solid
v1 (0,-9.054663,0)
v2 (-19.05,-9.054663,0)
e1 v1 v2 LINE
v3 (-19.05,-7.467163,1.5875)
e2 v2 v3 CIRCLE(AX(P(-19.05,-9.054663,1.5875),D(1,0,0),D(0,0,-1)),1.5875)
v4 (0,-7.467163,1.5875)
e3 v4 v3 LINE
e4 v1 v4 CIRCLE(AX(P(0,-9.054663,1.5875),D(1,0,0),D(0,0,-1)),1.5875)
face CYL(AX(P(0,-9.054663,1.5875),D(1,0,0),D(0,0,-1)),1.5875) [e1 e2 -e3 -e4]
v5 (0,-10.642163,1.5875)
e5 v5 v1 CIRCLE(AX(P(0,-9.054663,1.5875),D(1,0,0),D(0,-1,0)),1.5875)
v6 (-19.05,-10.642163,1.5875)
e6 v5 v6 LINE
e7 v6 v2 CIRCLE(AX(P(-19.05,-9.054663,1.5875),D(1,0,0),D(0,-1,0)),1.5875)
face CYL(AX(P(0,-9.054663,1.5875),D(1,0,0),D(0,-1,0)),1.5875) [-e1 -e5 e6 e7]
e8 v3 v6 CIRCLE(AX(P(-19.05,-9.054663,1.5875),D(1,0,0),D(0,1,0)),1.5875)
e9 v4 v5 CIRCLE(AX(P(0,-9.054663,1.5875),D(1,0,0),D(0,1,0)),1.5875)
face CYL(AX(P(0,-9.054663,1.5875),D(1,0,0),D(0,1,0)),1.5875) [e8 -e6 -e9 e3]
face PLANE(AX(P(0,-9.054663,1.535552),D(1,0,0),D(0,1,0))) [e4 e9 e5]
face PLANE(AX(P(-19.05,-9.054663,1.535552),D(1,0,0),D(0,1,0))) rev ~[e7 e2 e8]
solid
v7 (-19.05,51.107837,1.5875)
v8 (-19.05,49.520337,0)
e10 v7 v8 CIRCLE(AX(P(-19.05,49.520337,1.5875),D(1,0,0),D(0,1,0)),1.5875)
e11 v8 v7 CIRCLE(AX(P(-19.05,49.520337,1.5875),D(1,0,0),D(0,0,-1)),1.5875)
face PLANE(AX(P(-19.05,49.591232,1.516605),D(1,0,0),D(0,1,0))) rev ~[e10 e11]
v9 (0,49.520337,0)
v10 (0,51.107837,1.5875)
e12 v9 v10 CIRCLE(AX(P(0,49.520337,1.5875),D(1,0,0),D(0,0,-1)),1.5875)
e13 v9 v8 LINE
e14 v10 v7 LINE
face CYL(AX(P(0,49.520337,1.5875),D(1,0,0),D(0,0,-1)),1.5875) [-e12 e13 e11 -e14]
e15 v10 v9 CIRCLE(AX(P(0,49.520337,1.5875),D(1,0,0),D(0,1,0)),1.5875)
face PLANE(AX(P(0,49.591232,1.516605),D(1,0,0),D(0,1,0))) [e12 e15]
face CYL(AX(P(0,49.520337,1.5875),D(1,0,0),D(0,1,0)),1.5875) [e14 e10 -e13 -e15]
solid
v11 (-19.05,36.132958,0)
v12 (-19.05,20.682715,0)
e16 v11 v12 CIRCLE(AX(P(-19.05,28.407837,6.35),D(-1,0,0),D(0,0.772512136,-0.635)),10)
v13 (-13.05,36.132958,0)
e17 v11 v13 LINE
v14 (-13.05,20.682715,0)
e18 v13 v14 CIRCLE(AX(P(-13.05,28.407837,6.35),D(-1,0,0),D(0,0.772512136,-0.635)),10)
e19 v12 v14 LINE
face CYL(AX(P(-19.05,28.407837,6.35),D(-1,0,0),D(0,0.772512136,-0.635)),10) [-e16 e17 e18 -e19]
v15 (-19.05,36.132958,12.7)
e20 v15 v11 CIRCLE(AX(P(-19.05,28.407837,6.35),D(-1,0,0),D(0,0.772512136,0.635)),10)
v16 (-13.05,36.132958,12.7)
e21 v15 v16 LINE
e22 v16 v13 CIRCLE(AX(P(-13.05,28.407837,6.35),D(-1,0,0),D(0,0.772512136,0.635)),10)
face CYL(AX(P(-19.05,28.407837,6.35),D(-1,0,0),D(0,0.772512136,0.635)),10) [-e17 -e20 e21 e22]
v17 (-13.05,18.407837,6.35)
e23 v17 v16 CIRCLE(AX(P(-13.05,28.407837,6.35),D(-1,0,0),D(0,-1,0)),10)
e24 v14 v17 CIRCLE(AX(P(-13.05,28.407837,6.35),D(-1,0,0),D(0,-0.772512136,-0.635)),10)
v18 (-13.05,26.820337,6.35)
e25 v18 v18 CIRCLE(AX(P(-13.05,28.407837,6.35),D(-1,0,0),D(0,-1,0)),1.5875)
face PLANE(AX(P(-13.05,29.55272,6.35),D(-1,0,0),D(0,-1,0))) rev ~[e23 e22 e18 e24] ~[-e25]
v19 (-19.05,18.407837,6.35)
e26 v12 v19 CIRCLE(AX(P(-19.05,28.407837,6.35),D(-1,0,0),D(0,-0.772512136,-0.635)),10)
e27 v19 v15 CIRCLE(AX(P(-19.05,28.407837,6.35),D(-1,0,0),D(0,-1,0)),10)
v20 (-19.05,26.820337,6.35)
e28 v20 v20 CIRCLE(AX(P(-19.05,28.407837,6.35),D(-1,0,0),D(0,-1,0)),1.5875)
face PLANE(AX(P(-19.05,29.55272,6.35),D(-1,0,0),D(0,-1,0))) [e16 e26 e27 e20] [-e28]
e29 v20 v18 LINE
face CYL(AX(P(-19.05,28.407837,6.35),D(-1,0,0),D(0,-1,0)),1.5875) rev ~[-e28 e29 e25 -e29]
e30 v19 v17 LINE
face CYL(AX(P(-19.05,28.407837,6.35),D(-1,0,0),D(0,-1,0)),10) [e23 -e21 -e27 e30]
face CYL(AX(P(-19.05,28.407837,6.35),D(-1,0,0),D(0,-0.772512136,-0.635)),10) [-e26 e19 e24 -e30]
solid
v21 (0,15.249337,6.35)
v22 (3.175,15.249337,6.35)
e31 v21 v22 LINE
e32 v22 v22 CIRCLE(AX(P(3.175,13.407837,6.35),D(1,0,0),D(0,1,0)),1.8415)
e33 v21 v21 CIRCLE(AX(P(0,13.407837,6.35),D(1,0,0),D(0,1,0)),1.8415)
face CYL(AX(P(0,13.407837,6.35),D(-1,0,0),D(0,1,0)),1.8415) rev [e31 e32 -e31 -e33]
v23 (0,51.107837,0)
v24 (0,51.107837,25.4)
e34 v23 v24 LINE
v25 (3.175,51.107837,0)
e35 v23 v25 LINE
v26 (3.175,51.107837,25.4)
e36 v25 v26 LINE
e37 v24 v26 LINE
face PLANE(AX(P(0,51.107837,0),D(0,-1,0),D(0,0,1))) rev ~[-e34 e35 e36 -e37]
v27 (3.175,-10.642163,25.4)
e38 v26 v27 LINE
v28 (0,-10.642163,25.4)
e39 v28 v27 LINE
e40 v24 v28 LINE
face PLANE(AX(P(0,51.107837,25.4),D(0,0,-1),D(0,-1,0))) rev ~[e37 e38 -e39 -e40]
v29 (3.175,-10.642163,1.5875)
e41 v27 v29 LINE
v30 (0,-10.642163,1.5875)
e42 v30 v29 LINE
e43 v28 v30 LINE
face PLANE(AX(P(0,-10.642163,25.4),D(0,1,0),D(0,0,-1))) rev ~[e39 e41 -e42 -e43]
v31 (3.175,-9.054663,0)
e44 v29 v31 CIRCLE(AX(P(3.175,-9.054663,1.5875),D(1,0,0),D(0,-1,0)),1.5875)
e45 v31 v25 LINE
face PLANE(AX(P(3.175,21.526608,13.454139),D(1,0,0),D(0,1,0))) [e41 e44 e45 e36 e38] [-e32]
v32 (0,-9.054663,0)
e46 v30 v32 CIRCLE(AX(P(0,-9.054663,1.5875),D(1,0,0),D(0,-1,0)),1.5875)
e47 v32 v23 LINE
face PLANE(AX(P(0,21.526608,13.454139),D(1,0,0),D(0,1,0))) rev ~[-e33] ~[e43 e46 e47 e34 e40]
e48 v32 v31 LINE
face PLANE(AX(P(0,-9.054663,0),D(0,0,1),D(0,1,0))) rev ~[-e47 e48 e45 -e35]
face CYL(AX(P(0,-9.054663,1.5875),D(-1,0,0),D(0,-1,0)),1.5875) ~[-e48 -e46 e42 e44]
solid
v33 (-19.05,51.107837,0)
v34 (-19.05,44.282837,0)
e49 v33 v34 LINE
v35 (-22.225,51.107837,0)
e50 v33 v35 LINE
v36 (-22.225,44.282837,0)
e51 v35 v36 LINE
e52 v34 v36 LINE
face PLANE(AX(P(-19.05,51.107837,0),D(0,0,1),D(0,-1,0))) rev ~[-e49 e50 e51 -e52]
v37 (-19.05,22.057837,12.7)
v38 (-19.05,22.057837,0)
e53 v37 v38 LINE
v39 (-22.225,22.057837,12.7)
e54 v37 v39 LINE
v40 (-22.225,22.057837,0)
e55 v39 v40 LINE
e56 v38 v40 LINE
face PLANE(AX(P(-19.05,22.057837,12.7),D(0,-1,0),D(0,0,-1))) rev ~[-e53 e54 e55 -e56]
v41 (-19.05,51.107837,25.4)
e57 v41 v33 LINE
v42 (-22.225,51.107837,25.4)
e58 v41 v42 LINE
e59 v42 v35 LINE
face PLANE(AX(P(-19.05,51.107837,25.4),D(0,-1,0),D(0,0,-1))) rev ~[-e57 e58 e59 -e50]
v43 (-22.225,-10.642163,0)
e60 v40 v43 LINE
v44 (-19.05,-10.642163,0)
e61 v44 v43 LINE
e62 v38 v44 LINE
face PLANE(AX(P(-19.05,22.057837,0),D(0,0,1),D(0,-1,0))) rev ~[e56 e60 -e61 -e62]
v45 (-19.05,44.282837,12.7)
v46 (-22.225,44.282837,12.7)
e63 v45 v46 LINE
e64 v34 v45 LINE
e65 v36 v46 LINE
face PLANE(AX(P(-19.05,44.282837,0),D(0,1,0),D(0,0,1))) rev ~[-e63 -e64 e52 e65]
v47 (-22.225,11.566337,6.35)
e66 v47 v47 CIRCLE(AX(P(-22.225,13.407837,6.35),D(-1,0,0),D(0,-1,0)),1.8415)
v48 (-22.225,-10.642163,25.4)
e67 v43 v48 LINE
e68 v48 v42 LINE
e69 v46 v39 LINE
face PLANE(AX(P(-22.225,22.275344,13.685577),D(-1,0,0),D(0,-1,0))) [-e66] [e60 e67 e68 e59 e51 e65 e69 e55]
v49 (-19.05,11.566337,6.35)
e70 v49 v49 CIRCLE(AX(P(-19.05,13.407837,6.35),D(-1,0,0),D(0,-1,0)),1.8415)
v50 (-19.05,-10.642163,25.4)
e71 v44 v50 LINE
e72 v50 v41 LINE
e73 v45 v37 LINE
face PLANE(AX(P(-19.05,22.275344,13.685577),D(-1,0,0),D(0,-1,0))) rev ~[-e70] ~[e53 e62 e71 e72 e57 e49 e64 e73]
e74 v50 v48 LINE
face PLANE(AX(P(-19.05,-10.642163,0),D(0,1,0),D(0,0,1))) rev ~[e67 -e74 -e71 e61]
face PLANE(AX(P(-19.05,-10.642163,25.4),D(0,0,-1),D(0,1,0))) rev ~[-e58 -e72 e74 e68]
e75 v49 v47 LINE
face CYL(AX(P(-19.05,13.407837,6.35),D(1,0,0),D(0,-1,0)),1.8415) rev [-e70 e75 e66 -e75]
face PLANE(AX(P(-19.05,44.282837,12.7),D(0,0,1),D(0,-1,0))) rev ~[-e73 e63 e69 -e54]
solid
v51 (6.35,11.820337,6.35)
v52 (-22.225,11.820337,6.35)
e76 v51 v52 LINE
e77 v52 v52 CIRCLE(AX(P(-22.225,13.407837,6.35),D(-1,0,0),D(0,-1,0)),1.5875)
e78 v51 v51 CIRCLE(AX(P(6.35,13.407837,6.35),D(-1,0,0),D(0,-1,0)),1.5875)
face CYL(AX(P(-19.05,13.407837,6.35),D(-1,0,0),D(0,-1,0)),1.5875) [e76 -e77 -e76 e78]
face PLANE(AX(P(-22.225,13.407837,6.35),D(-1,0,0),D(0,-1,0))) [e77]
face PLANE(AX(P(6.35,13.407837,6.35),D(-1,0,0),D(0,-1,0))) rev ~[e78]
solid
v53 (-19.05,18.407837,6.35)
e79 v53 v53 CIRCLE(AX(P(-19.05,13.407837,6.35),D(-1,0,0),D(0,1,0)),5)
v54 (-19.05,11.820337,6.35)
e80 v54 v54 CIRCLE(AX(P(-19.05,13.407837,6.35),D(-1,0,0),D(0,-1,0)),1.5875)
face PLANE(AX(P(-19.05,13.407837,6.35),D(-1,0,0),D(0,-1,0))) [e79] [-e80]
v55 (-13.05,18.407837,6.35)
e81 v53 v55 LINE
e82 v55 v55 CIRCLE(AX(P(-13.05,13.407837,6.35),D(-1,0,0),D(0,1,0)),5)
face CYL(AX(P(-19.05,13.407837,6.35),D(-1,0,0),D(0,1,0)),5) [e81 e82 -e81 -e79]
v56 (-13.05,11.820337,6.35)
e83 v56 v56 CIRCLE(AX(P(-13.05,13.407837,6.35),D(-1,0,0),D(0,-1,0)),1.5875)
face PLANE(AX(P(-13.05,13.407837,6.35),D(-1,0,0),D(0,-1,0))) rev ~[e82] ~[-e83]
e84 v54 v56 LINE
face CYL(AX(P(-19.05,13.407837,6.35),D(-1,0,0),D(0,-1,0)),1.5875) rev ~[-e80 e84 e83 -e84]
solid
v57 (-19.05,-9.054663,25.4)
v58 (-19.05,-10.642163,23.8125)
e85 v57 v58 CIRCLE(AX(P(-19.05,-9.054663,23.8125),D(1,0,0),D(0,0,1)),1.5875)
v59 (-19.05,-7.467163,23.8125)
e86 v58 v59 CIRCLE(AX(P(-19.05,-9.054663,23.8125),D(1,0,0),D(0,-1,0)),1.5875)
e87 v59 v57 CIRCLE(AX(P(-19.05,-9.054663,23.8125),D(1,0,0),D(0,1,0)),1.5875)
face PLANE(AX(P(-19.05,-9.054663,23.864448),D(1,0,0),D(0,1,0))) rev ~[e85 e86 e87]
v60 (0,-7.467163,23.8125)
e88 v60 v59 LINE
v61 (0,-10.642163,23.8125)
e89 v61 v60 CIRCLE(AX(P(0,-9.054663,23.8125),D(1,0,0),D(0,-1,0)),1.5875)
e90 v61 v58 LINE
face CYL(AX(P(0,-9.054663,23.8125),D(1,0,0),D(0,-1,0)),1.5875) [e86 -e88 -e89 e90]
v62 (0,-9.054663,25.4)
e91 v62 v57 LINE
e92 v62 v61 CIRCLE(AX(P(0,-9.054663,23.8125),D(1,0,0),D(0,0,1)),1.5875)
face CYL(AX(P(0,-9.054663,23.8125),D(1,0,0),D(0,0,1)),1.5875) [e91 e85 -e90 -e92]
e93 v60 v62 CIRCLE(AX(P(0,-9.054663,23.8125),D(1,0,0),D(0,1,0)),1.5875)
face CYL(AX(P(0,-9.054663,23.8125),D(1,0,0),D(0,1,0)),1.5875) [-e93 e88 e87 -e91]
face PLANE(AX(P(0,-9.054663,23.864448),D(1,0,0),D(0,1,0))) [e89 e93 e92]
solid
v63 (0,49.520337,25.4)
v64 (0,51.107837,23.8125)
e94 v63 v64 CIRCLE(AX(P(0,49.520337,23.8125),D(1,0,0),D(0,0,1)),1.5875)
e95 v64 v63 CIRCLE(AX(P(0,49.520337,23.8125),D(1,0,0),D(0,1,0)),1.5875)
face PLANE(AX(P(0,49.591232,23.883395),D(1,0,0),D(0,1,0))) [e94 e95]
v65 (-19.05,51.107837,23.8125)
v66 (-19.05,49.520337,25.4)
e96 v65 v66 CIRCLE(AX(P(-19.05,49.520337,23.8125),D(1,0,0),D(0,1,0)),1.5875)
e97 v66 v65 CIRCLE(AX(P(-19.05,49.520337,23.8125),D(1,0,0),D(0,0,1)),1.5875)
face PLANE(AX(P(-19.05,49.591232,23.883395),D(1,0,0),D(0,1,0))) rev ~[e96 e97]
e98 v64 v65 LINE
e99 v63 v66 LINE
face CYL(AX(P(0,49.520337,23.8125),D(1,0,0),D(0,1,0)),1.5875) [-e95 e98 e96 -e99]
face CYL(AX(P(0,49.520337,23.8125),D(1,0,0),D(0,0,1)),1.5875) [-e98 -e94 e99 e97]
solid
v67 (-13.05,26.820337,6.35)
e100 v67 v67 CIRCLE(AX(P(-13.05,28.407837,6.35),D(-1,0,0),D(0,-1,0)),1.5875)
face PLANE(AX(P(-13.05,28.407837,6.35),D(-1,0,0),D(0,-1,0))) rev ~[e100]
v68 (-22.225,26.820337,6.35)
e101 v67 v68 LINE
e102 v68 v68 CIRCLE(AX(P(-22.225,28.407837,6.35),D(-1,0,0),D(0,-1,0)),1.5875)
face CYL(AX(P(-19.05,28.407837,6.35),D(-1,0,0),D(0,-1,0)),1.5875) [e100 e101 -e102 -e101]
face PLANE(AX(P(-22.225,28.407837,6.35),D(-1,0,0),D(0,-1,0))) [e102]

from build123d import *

# Parameters (mm, degrees)
F0_R      = 5
F0_R_2    = 1.8415
F0_R_3    = 1.5875
F1_DEPTH  = 3.175
F2_DEPTH  = 19.05
F3_R      = 1.8415
F4_DEPTH  = 3.175
F3_R_2    = 1.5875
F5_DEPTH  = 3.175
F6_DEPTH  = 6
F7_DEPTH  = 6
F8_DEPTH  = 3.175
F9_DEPTH  = 25.4
F10_DEPTH = 6


# Not quite as in the source:
# - a feature names something its author has since deleted; it is built from what else it names


with BuildPart() as f1:
    # F0 (on Right) → F1 (new body)
    with BuildSketch(Plane.YZ):
        with BuildLine():
            ThreePointArc((18.4078367749, 6.35), (25.0352423421, 15.7641174197), (36.1329581332, 12.7))
            Line((36.1329581332, 12.7), (44.2828367749, 12.7))
            Line((44.2828367749, 12.7), (44.2828367749, 0))
            Line((44.2828367749, 0), (49.5203367749, 0))
            ThreePointArc((49.5203367749, 0), (48.3978047598, 2.7100320151), (51.1078367749, 1.5875))
            Line((51.1078367749, 1.5875), (51.1078367749, 23.8125))
            ThreePointArc((51.1078367749, 23.8125), (48.3978047598, 22.6899679849), (49.5203367749, 25.4))
            Line((49.5203367749, 25.4), (41.8216693056, 25.4))
            Line((41.8216693056, 25.4), (35.8211970083, 25.4))
            Line((35.8211970083, 25.4), (-9.0546632251, 25.4))
            ThreePointArc((-9.0546632251, 25.4), (-7.9321312099, 24.9350320151), (-7.4671632251, 23.8125))
            ThreePointArc((-7.4671632251, 23.8125), (-9.0546632251, 22.225), (-10.6421632251, 23.8125))
            Line((-10.6421632251, 23.8125), (-10.6421632251, 1.5875))
            ThreePointArc((-10.6421632251, 1.5875), (-9.0546632251, 3.175), (-7.4671632251, 1.5875))
            ThreePointArc((-7.4671632251, 1.5875), (-7.9321312099, 0.4649679849), (-9.0546632251, 0))
            Line((-9.0546632251, 0), (20.6827154167, 0))
            ThreePointArc((20.6827154167, 0), (18.9937193553, 2.9774055671), (18.4078367749, 6.35))
        make_face()
        with Locations((13.4078367749, 6.35)):
            Circle(F0_R, mode=Mode.SUBTRACT)
        with BuildLine():
            ThreePointArc((36.1329581332, 0), (37.8219541946, 2.9774055671), (38.4078367749, 6.35))
            ThreePointArc((38.4078367749, 6.35), (37.8219541946, 9.7225944329), (36.1329581332, 12.7))
            Line((36.1329581332, 12.7), (22.0578367749, 12.7))
            Line((22.0578367749, 12.7), (22.0578367749, 0))
            Line((22.0578367749, 0), (36.1329581332, 0))
        make_face()
        with Locations((28.4078367749, 6.35)):
            Circle(F0_R_2, mode=Mode.SUBTRACT)
        with BuildLine():
            ThreePointArc((36.1329581332, 12.7), (37.8219541946, 9.7225944329), (38.4078367749, 6.35))
            ThreePointArc((38.4078367749, 6.35), (37.8219541946, 2.9774055671), (36.1329581332, 0))
            Line((36.1329581332, 0), (43.4878367749, 0))
            Line((43.4878367749, 0), (44.2828367749, 0))
            Line((44.2828367749, 0), (44.2828367749, 12.7))
            Line((44.2828367749, 12.7), (36.1329581332, 12.7))
        make_face()
        with Locations((13.4078367749, 6.35)):
            Circle(F0_R)
        with Locations((13.4078367749, 6.35)):
            Circle(F0_R_2, mode=Mode.SUBTRACT)
        with BuildLine():
            Line((22.0578367749, 12.7), (36.1329581332, 12.7))
            ThreePointArc((36.1329581332, 12.7), (25.0352423421, 15.7641174197), (18.4078367749, 6.35))
            ThreePointArc((18.4078367749, 6.35), (18.9937193553, 2.9774055671), (20.6827154167, 0))
            Line((20.6827154167, 0), (22.0578367749, 0))
            Line((22.0578367749, 0), (22.0578367749, 12.7))
        make_face()
        with Locations((28.4078367749, 6.35)):
            Circle(F0_R_2)
        with Locations((28.4078367749, 6.35)):
            Circle(F0_R_3, mode=Mode.SUBTRACT)
        with BuildLine():
            ThreePointArc((-10.6421632251, 1.5875), (-10.1771952402, 0.4649679849), (-9.0546632251, 0))
            ThreePointArc((-9.0546632251, 0), (-7.9321312099, 0.4649679849), (-7.4671632251, 1.5875))
            ThreePointArc((-7.4671632251, 1.5875), (-9.0546632251, 3.175), (-10.6421632251, 1.5875))
        make_face()
        with BuildLine():
            ThreePointArc((51.1078367749, 1.5875), (48.3978047598, 2.7100320151), (49.5203367749, 0))
            ThreePointArc((49.5203367749, 0), (50.6428687901, 0.4649679849), (51.1078367749, 1.5875))
        make_face()
        with BuildLine():
            ThreePointArc((-9.0546632251, 25.4), (-10.1771952402, 24.9350320151), (-10.6421632251, 23.8125))
            ThreePointArc((-10.6421632251, 23.8125), (-9.0546632251, 22.225), (-7.4671632251, 23.8125))
            ThreePointArc((-7.4671632251, 23.8125), (-7.9321312099, 24.9350320151), (-9.0546632251, 25.4))
        make_face()
        with BuildLine():
            ThreePointArc((49.5203367749, 25.4), (48.3978047598, 22.6899679849), (51.1078367749, 23.8125))
            ThreePointArc((51.1078367749, 23.8125), (50.6428687901, 24.9350320151), (49.5203367749, 25.4))
        make_face()
        with Locations((28.4078367749, 6.35)):
            Circle(F0_R_3)
        with BuildLine():
            ThreePointArc((51.1078367749, 1.5875), (50.6428687901, 0.4649679849), (49.5203367749, 0))
            Line((49.5203367749, 0), (50.2833090723, 0))
            Line((50.2833090723, 0), (51.1078367749, 0))
            Line((51.1078367749, 0), (51.1078367749, 1.5875))
        make_face()
        with BuildLine():
            Line((-10.6421632251, 25.4), (-10.6421632251, 23.8125))
            ThreePointArc((-10.6421632251, 23.8125), (-10.1771952402, 24.9350320151), (-9.0546632251, 25.4))
            Line((-9.0546632251, 25.4), (-10.6421632251, 25.4))
        make_face()
        with BuildLine():
            ThreePointArc((49.5203367749, 25.4), (50.6428687901, 24.9350320151), (51.1078367749, 23.8125))
            Line((51.1078367749, 23.8125), (51.1078367749, 25.4))
            Line((51.1078367749, 25.4), (49.5203367749, 25.4))
        make_face()
    extrude(amount=F1_DEPTH)


with BuildPart() as f2:
    # F0 (on Right) → F2 (new body)
    with BuildSketch(Plane.YZ):
        with BuildLine():
            ThreePointArc((-10.6421632251, 1.5875), (-10.1771952402, 0.4649679849), (-9.0546632251, 0))
            ThreePointArc((-9.0546632251, 0), (-7.9321312099, 0.4649679849), (-7.4671632251, 1.5875))
            ThreePointArc((-7.4671632251, 1.5875), (-9.0546632251, 3.175), (-10.6421632251, 1.5875))
        make_face()
    extrude(amount=-F2_DEPTH)


with BuildPart() as f2b:
    # F0 (on Right) → F2, piece 2 (new body)
    with BuildSketch(Plane.YZ):
        with BuildLine():
            ThreePointArc((51.1078367749, 1.5875), (48.3978047598, 2.7100320151), (49.5203367749, 0))
            ThreePointArc((49.5203367749, 0), (50.6428687901, 0.4649679849), (51.1078367749, 1.5875))
        make_face()
    extrude(amount=-F2_DEPTH)


with BuildPart() as f2c:
    # F0 (on Right) → F2, piece 3 (new body)
    with BuildSketch(Plane.YZ):
        with BuildLine():
            ThreePointArc((-9.0546632251, 25.4), (-10.1771952402, 24.9350320151), (-10.6421632251, 23.8125))
            ThreePointArc((-10.6421632251, 23.8125), (-9.0546632251, 22.225), (-7.4671632251, 23.8125))
            ThreePointArc((-7.4671632251, 23.8125), (-7.9321312099, 24.9350320151), (-9.0546632251, 25.4))
        make_face()
    extrude(amount=-F2_DEPTH)


with BuildPart() as f2d:
    # F0 (on Right) → F2, piece 4 (new body)
    with BuildSketch(Plane.YZ):
        with BuildLine():
            ThreePointArc((49.5203367749, 25.4), (48.3978047598, 22.6899679849), (51.1078367749, 23.8125))
            ThreePointArc((51.1078367749, 23.8125), (50.6428687901, 24.9350320151), (49.5203367749, 25.4))
        make_face()
    extrude(amount=-F2_DEPTH)


with BuildPart() as f4:
    # F3 (on face) → F4 (new body)
    with BuildSketch(Plane(origin=(-19.05, 0, 0), x_dir=(0, -1, 0), z_dir=(-1, 0, 0))):
        with BuildLine():
            Line((10.6421632251, 25.4), (-49.5203367749, 25.4))
            ThreePointArc((-49.5203367749, 25.4), (-48.3978047598, 24.9350320151), (-47.9328367749, 23.8125))
            ThreePointArc((-47.9328367749, 23.8125), (-49.5203367749, 22.225), (-51.1078367749, 23.8125))
            Line((-51.1078367749, 23.8125), (-51.1078367749, 0))
            Line((-51.1078367749, 0), (-44.2828367749, 0))
            Line((-44.2828367749, 0), (-44.2828367749, 12.7))
            Line((-44.2828367749, 12.7), (-36.1329581332, 12.7))
            ThreePointArc((-36.1329581332, 12.7), (-25.0352423421, 15.7641174197), (-18.4078367749, 6.35))
            ThreePointArc((-18.4078367749, 6.35), (-18.9937193553, 2.9774055671), (-20.6827154167, 0))
            Line((-20.6827154167, 0), (10.6421632251, 0))
            Line((10.6421632251, 0), (10.6421632251, 25.4))
        make_face()
        with BuildLine():
            ThreePointArc((-8.4078367749, 6.35), (-13.4078367749, 1.35), (-18.4078367749, 6.35))
            ThreePointArc((-18.4078367749, 6.35), (-13.4078367749, 11.35), (-8.4078367749, 6.35))
        make_face(mode=Mode.SUBTRACT)
        with BuildLine():
            ThreePointArc((-8.4078367749, 6.35), (-13.4078367749, 11.35), (-18.4078367749, 6.35))
            ThreePointArc((-18.4078367749, 6.35), (-13.4078367749, 1.35), (-8.4078367749, 6.35))
        make_face()
        with Locations((-13.4078367749, 6.35)):
            Circle(F3_R, mode=Mode.SUBTRACT)
        with BuildLine():
            Line((-22.0578367749, 0), (-20.6827154167, 0))
            ThreePointArc((-20.6827154167, 0), (-18.9937193553, 2.9774055671), (-18.4078367749, 6.35))
            ThreePointArc((-18.4078367749, 6.35), (-25.0352423421, 15.7641174197), (-36.1329581332, 12.7))
            Line((-36.1329581332, 12.7), (-22.0578367749, 12.7))
            Line((-22.0578367749, 12.7), (-22.0578367749, 6.35))
            Line((-22.0578367749, 6.35), (-22.0578367749, 0))
        make_face()
        with BuildLine():
            ThreePointArc((-47.9328367749, 23.8125), (-48.3978047598, 24.9350320151), (-49.5203367749, 25.4))
            ThreePointArc((-49.5203367749, 25.4), (-50.6428687901, 24.9350320151), (-51.1078367749, 23.8125))
            ThreePointArc((-51.1078367749, 23.8125), (-49.5203367749, 22.225), (-47.9328367749, 23.8125))
        make_face()
        with BuildLine():
            Line((-49.5203367749, 25.4), (-51.1078367749, 25.4))
            Line((-51.1078367749, 25.4), (-51.1078367749, 23.8125))
            ThreePointArc((-51.1078367749, 23.8125), (-50.6428687901, 24.9350320151), (-49.5203367749, 25.4))
        make_face()
    extrude(amount=F4_DEPTH)


with BuildPart() as f5:
    # F3 (on face) → F5 (new body)
    with BuildSketch(Plane(origin=(-19.05, 0, 0), x_dir=(0, -1, 0), z_dir=(-1, 0, 0))):
        with Locations((-28.4078367749, 6.35)):
            Circle(F3_R_2)
    extrude(amount=F5_DEPTH)

    # F3 (on face) → F6 (join)
    with BuildSketch(Plane(origin=(-19.05, 0, 0), x_dir=(0, -1, 0), z_dir=(-1, 0, 0))):
        with Locations((-28.4078367749, 6.35)):
            Circle(F3_R_2)
    extrude(amount=-F6_DEPTH)


with BuildPart() as f7:
    # F3 (on face) → F7 (new body)
    with BuildSketch(Plane(origin=(-19.05, 0, 0), x_dir=(0, -1, 0), z_dir=(-1, 0, 0))):
        with BuildLine():
            ThreePointArc((-36.1329581332, 12.7), (-38.4078367749, 6.35), (-36.1329581332, 0))
            Line((-36.1329581332, 0), (-22.0578367749, 0))
            Line((-22.0578367749, 0), (-22.0578367749, 6.35))
            Line((-22.0578367749, 6.35), (-22.0578367749, 12.7))
            Line((-22.0578367749, 12.7), (-36.1329581332, 12.7))
        make_face()
        with Locations((-28.4078367749, 6.35)):
            Circle(F3_R, mode=Mode.SUBTRACT)
        with BuildLine():
            Line((-22.0578367749, 0), (-20.6827154167, 0))
            ThreePointArc((-20.6827154167, 0), (-18.9937193553, 2.9774055671), (-18.4078367749, 6.35))
            ThreePointArc((-18.4078367749, 6.35), (-25.0352423421, 15.7641174197), (-36.1329581332, 12.7))
            Line((-36.1329581332, 12.7), (-22.0578367749, 12.7))
            Line((-22.0578367749, 12.7), (-22.0578367749, 6.35))
            Line((-22.0578367749, 6.35), (-22.0578367749, 0))
        make_face()
        with BuildLine():
            ThreePointArc((-36.1329581332, 0), (-28.4078367749, -3.65), (-20.6827154167, 0))
            Line((-20.6827154167, 0), (-22.0578367749, 0))
            Line((-22.0578367749, 0), (-36.1329581332, 0))
        make_face()
        with Locations((-28.4078367749, 6.35)):
            Circle(F3_R)
        with Locations((-28.4078367749, 6.35)):
            Circle(F3_R_2, mode=Mode.SUBTRACT)
    extrude(amount=-F7_DEPTH)


with BuildPart() as f8:
    # F3 (on face) → F8 (new body)
    with BuildSketch(Plane(origin=(-19.05, 0, 0), x_dir=(0, -1, 0), z_dir=(-1, 0, 0))):
        with Locations((-13.4078367749, 6.35)):
            Circle(F3_R_2)
    extrude(amount=F8_DEPTH)

    # F3 (on face) → F9 (join)
    with BuildSketch(Plane(origin=(-19.05, 0, 0), x_dir=(0, -1, 0), z_dir=(-1, 0, 0))):
        with Locations((-13.4078367749, 6.35)):
            Circle(F3_R_2)
    extrude(amount=-F9_DEPTH)


with BuildPart() as f10:
    # F3 (on face) → F10 (new body)
    with BuildSketch(Plane(origin=(-19.05, 0, 0), x_dir=(0, -1, 0), z_dir=(-1, 0, 0))):
        with BuildLine():
            ThreePointArc((-8.4078367749, 6.35), (-13.4078367749, 11.35), (-18.4078367749, 6.35))
            ThreePointArc((-18.4078367749, 6.35), (-13.4078367749, 1.35), (-8.4078367749, 6.35))
        make_face()
        with Locations((-13.4078367749, 6.35)):
            Circle(F3_R, mode=Mode.SUBTRACT)
        with Locations((-13.4078367749, 6.35)):
            Circle(F3_R)
        with Locations((-13.4078367749, 6.35)):
            Circle(F3_R_2, mode=Mode.SUBTRACT)
    extrude(amount=-F10_DEPTH)


solid = Compound([f1.part, f2.part, f2b.part, f2c.part, f2d.part, f4.part, f5.part, f7.part, f8.part, f10.part])
